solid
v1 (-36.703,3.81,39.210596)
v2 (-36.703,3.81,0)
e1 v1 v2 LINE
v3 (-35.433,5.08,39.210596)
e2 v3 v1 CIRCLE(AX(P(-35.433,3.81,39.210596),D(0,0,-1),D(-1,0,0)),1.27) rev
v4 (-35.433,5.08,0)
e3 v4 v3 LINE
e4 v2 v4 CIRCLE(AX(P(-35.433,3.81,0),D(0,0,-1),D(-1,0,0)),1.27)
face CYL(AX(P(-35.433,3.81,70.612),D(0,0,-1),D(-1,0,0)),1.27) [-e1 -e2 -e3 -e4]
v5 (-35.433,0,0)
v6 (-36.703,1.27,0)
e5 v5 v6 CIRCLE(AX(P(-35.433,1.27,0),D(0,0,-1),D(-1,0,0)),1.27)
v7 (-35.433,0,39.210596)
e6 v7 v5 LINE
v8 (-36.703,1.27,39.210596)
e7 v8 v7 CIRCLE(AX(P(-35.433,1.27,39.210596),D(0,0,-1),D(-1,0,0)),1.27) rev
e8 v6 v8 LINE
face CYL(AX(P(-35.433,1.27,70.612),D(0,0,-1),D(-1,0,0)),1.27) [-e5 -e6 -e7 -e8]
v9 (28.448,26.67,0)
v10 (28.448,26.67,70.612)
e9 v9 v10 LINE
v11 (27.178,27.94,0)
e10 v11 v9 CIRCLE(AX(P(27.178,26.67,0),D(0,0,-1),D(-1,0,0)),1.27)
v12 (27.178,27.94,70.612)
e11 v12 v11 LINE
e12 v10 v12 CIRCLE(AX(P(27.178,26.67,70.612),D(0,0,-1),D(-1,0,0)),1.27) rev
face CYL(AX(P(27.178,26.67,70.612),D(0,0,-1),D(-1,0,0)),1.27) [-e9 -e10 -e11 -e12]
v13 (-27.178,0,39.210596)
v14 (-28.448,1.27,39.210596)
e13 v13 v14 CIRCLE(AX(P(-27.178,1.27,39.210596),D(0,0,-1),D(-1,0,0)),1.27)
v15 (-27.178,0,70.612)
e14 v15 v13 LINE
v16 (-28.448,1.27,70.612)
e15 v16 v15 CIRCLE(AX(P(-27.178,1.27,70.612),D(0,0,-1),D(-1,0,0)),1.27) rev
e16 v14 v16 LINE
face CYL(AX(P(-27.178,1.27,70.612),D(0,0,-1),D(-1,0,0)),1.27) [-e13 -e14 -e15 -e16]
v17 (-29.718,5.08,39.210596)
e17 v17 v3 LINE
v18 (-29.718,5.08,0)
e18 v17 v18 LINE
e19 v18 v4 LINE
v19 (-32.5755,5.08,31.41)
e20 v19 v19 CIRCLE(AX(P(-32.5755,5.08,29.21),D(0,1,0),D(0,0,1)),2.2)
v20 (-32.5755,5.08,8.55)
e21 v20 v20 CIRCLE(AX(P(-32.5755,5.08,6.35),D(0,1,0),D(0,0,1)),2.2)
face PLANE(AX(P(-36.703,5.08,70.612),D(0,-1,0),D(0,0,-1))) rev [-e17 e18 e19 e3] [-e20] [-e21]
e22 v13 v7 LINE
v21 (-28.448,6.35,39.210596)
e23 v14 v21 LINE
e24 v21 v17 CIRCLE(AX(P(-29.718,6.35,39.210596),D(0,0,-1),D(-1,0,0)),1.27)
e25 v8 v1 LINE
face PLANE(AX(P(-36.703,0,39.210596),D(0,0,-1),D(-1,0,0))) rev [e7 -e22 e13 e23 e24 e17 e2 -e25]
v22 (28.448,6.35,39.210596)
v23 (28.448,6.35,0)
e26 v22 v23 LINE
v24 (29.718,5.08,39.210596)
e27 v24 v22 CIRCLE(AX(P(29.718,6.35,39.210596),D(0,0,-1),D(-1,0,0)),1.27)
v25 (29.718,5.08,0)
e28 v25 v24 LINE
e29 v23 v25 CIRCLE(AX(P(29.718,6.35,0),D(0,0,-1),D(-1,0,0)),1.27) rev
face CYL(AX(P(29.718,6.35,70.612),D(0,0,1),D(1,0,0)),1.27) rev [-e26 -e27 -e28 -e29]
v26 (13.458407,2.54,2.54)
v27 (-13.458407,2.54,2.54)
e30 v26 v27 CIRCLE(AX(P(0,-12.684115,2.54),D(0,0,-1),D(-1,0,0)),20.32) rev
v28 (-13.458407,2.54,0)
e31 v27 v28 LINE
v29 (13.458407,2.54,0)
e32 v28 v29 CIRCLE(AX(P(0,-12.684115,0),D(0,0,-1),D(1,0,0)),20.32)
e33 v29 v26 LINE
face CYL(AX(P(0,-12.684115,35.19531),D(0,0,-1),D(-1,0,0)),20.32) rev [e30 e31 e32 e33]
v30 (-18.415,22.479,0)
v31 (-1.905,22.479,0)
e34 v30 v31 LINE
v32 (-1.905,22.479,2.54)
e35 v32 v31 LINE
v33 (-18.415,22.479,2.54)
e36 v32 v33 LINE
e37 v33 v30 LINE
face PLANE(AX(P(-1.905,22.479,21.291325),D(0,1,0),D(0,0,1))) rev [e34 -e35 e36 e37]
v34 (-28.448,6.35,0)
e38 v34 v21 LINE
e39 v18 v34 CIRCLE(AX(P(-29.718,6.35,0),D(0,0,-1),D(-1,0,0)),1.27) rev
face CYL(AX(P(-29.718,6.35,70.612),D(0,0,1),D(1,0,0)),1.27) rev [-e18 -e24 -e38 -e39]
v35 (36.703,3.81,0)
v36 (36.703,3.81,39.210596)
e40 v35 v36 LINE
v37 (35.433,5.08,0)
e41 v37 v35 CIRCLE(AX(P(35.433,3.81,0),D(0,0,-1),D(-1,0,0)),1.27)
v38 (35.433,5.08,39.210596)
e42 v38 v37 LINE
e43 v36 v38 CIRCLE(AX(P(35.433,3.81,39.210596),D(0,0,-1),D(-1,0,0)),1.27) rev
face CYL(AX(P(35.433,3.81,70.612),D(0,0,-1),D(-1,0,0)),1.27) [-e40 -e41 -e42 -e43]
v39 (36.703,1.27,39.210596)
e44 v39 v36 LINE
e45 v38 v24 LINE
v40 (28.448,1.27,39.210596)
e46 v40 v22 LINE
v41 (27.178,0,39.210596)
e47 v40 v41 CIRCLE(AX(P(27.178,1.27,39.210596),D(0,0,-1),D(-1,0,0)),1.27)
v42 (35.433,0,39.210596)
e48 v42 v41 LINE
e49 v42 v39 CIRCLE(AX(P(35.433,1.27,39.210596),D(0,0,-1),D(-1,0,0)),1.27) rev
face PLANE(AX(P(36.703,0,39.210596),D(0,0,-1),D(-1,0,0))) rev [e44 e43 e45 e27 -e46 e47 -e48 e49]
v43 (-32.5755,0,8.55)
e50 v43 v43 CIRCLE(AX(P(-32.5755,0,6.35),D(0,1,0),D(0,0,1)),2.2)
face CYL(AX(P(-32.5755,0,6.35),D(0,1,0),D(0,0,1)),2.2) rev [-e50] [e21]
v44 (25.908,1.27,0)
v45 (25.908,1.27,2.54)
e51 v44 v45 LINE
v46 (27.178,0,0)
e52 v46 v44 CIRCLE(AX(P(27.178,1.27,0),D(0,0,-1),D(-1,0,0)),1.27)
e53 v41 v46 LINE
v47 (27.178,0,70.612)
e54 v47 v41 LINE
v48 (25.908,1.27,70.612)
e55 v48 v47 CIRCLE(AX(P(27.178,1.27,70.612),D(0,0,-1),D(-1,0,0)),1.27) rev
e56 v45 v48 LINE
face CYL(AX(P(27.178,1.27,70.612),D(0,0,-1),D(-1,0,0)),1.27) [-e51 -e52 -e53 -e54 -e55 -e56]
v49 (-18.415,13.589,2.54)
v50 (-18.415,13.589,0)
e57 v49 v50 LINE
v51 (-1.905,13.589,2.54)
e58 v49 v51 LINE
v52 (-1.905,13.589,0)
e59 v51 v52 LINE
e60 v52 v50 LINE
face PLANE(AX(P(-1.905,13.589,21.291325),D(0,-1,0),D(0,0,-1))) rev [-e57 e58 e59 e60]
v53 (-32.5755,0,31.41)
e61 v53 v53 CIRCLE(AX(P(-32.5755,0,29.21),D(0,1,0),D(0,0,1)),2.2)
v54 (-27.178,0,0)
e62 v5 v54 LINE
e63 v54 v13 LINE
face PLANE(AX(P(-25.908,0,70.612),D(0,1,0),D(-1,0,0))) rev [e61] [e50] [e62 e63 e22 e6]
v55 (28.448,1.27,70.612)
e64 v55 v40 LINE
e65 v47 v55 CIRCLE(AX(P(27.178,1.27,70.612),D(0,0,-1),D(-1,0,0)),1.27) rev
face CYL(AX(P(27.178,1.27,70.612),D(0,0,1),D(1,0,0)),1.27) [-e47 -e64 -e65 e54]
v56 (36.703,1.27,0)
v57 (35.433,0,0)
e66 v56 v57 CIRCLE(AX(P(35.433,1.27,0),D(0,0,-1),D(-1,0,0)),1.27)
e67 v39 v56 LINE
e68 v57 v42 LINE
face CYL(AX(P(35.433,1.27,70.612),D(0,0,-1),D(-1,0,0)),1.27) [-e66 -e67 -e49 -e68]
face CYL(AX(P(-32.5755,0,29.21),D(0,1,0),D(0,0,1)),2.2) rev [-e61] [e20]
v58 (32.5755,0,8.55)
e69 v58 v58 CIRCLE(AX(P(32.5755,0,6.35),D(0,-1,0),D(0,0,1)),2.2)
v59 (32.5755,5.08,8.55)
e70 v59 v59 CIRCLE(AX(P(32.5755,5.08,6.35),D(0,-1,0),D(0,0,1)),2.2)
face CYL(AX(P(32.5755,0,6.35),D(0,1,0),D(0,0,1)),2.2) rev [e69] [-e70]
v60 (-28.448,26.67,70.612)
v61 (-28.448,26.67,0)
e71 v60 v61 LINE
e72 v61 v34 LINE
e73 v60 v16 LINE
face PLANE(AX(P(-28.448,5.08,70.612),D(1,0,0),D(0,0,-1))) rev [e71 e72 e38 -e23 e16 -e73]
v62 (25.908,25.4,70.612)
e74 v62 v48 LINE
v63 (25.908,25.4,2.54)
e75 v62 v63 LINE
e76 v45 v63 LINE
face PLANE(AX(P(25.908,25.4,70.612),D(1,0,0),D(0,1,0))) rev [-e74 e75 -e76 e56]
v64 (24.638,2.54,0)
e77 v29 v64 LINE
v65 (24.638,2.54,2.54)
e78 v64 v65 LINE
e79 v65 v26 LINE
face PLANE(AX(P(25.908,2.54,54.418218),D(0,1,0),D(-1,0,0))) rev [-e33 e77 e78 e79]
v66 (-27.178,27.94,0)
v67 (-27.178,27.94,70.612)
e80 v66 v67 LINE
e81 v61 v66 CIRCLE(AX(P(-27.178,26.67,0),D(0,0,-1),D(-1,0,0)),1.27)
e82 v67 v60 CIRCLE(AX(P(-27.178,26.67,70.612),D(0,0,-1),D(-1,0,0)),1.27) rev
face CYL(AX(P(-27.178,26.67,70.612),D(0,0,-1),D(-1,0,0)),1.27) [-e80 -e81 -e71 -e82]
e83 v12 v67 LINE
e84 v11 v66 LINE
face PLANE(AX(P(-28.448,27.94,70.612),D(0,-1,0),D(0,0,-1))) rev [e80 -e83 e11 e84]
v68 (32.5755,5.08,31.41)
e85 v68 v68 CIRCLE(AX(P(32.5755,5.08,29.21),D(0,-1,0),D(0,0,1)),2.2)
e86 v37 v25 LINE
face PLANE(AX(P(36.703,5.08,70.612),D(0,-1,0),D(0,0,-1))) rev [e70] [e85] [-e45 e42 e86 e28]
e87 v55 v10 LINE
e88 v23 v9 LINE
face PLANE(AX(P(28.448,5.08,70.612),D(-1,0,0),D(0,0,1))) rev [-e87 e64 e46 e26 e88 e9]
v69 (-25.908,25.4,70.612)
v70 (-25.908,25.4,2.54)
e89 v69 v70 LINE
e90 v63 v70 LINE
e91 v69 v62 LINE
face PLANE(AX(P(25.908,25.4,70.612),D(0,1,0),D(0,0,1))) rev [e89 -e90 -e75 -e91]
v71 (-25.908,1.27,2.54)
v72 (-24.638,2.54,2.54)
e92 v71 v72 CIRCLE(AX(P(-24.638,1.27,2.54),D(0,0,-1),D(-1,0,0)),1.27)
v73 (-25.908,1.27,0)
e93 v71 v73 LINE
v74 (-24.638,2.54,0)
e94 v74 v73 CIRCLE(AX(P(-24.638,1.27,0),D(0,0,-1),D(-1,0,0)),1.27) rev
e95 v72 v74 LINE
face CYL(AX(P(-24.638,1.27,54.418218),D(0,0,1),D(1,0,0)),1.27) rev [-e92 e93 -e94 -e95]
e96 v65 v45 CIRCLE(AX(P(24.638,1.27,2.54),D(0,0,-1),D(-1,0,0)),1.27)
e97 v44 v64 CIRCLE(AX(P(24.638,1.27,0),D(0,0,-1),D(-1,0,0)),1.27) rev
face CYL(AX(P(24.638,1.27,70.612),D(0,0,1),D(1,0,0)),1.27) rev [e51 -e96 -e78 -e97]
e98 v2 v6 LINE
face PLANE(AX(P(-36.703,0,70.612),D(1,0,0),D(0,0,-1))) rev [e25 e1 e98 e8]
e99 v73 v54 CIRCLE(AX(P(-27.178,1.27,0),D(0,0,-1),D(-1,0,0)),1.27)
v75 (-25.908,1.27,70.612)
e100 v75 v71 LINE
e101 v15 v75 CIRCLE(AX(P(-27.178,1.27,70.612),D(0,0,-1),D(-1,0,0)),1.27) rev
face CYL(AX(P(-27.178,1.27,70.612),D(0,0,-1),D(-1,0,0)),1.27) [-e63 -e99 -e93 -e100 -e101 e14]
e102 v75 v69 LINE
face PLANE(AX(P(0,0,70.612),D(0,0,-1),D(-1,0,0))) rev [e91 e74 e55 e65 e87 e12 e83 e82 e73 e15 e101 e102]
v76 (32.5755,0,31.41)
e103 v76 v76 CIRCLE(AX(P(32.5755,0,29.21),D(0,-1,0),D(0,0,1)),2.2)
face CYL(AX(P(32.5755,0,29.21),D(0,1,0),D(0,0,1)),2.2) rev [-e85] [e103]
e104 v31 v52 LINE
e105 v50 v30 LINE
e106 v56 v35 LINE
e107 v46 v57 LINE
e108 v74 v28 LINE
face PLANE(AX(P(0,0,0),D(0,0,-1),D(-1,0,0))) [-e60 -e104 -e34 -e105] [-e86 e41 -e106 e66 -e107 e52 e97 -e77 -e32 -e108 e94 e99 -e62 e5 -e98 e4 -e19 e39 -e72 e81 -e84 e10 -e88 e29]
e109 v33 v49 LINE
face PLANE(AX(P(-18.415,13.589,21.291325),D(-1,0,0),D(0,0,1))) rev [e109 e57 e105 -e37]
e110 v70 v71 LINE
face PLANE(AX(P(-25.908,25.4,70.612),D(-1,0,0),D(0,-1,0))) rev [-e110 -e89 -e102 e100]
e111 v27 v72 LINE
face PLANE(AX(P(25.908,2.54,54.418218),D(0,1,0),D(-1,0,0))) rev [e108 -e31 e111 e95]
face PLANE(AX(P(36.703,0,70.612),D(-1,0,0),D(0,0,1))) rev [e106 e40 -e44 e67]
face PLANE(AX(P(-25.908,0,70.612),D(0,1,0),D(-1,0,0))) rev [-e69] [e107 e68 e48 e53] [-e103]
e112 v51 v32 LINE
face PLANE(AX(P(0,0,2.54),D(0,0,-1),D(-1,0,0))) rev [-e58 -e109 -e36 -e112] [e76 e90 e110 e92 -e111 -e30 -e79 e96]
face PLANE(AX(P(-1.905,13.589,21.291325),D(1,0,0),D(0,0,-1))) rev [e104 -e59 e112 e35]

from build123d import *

# Parameters (mm, degrees)
BOSS_EXTRUDE1_DEPTH = 70.612
SKETCH2_R           = 2.2
CUT_EXTRUDE1_DEPTH  = 83.799422419
SKETCH3_W           = 8.255
SKETCH3_H           = 31.401404102
CUT_EXTRUDE2_DEPTH  = 83.799422419
BOSS_EXTRUDE3_DEPTH = 2.54
CUT_EXTRUDE6_DEPTH  = 2.54
SKETCH9_W           = 51.816
SKETCH9_H           = 2.54
CUT_EXTRUDE7_DEPTH  = 2.54
FILLET1_R           = 1.27
FILLET2_R           = 1.27
SKETCH11_W          = 16.51
SKETCH11_H          = 8.89
CUT_EXTRUDE8_DEPTH  = 2.54


with BuildPart() as part:
    # Sketch1 → Boss-Extrude1 (new body)
    with BuildSketch(Plane.XY):
        Polygon((25.908, 25.4), (-25.908, 25.4), (-25.908, 0), (-36.703, 0), (-36.703, 5.08), (-28.448, 5.08), (-28.448, 27.94), (28.448, 27.94), (28.448, 5.08), (36.703, 5.08), (36.703, 0), (25.908, 0), align=None)
    extrude(amount=BOSS_EXTRUDE1_DEPTH)

    # Sketch2 → Cut-Extrude1 (cut, through all)
    with BuildSketch(Plane(origin=(0, 5.08, 0), x_dir=(1, 0, 0), z_dir=(0, 1, 0))):
        with Locations(Location((-32.5755, -6.35, 0), (0, 0, 270))):
            Circle(SKETCH2_R)
        with Locations(Location((-32.5755, -29.21, 0), (0, 0, 270))):
            Circle(SKETCH2_R)
    cut_extrude1 = extrude(amount=-CUT_EXTRUDE1_DEPTH, mode=Mode.SUBTRACT)

    # Mirror1: Cut-Extrude1 across plane
    add(cut_extrude1.mirror(Plane(origin=(0, 0, 0), x_dir=(0, 0, 1), z_dir=(1, 0, 0))), mode=Mode.SUBTRACT)

    # Sketch3 → Cut-Extrude2 (cut, through all)
    with BuildSketch(Plane(origin=(0, 5.08, 0), x_dir=(1, 0, 0), z_dir=(0, 1, 0))):
        with Locations((-32.5755, -54.911297949)):
            Rectangle(SKETCH3_W, SKETCH3_H)
        with Locations((32.5755, -54.911297949)):
            Rectangle(SKETCH3_W, SKETCH3_H)
    extrude(amount=-CUT_EXTRUDE2_DEPTH, mode=Mode.SUBTRACT)

    # Sketch6 → Boss-Extrude3 (add)
    with BuildSketch(Plane(origin=(0, 0, 0), x_dir=(-1, 0, 0), z_dir=(0, 0, -1))):
        Polygon((-25.908, 0), (25.908, 0), (36.703, 0), (36.703, 5.08), (28.448, 5.08), (28.448, 27.94), (-28.448, 27.94), (-28.448, 5.08), (-36.703, 5.08), (-36.703, 0), align=None)
    extrude(amount=-BOSS_EXTRUDE3_DEPTH)

    # Sketch8 → Cut-Extrude6 (cut)
    with BuildSketch(Plane(origin=(0, 0, 0), x_dir=(-1, 0, 0), z_dir=(0, 0, -1))):
        with BuildLine():
            Line((-15.875, 0), (15.875, 0))
            ThreePointArc((15.875, 0), (0, 7.635884934), (-15.875, 0))
        make_face()
    extrude(amount=-CUT_EXTRUDE6_DEPTH, mode=Mode.SUBTRACT)

    # Sketch9 → Cut-Extrude7 (cut)
    with BuildSketch(Plane(origin=(0, 0, 0), x_dir=(-1, 0, 0), z_dir=(0, 0, -1))):
        with Locations((0, 1.27)):
            Rectangle(SKETCH9_W, SKETCH9_H)
    extrude(amount=-CUT_EXTRUDE7_DEPTH, mode=Mode.SUBTRACT)

    # Fillet1
    fillet1_edges = [part.edges().sort_by_distance(p)[0] for p in [
        (-25.908, 0, 35.306),
        (-28.448, 27.94, 35.306),
        (28.448, 27.94, 35.306),
        (25.908, 0, 35.306),
        (-36.703, 0, 19.605297949),
        (-36.703, 5.08, 19.605297949),
        (-28.448, 5.08, 19.605297949),
        (28.448, 5.08, 19.605297949),
        (36.703, 5.08, 19.605297949),
        (36.703, 0, 19.605297949),
        (-28.448, 0, 54.911297949),
        (28.448, 0, 54.911297949),
    ]]
    fillet(fillet1_edges, radius=FILLET1_R - 0.0001)  # a hair under: the kernel refuses the full size

    # Fillet2
    fillet2_edges = [part.edges().sort_by_distance(p)[0] for p in [
        (-25.908, 2.54, 1.27),
        (25.908, 2.54, 1.27),
    ]]
    fillet(fillet2_edges, radius=FILLET2_R)

    # Sketch11 → Cut-Extrude8 (cut)
    with BuildSketch(Plane(origin=(0, 0, 0), x_dir=(-1, 0, 0), z_dir=(0, 0, -1))):
        with Locations((10.16, 18.034)):
            Rectangle(SKETCH11_W, SKETCH11_H)
    extrude(amount=-CUT_EXTRUDE8_DEPTH, mode=Mode.SUBTRACT)


solid = part.part
